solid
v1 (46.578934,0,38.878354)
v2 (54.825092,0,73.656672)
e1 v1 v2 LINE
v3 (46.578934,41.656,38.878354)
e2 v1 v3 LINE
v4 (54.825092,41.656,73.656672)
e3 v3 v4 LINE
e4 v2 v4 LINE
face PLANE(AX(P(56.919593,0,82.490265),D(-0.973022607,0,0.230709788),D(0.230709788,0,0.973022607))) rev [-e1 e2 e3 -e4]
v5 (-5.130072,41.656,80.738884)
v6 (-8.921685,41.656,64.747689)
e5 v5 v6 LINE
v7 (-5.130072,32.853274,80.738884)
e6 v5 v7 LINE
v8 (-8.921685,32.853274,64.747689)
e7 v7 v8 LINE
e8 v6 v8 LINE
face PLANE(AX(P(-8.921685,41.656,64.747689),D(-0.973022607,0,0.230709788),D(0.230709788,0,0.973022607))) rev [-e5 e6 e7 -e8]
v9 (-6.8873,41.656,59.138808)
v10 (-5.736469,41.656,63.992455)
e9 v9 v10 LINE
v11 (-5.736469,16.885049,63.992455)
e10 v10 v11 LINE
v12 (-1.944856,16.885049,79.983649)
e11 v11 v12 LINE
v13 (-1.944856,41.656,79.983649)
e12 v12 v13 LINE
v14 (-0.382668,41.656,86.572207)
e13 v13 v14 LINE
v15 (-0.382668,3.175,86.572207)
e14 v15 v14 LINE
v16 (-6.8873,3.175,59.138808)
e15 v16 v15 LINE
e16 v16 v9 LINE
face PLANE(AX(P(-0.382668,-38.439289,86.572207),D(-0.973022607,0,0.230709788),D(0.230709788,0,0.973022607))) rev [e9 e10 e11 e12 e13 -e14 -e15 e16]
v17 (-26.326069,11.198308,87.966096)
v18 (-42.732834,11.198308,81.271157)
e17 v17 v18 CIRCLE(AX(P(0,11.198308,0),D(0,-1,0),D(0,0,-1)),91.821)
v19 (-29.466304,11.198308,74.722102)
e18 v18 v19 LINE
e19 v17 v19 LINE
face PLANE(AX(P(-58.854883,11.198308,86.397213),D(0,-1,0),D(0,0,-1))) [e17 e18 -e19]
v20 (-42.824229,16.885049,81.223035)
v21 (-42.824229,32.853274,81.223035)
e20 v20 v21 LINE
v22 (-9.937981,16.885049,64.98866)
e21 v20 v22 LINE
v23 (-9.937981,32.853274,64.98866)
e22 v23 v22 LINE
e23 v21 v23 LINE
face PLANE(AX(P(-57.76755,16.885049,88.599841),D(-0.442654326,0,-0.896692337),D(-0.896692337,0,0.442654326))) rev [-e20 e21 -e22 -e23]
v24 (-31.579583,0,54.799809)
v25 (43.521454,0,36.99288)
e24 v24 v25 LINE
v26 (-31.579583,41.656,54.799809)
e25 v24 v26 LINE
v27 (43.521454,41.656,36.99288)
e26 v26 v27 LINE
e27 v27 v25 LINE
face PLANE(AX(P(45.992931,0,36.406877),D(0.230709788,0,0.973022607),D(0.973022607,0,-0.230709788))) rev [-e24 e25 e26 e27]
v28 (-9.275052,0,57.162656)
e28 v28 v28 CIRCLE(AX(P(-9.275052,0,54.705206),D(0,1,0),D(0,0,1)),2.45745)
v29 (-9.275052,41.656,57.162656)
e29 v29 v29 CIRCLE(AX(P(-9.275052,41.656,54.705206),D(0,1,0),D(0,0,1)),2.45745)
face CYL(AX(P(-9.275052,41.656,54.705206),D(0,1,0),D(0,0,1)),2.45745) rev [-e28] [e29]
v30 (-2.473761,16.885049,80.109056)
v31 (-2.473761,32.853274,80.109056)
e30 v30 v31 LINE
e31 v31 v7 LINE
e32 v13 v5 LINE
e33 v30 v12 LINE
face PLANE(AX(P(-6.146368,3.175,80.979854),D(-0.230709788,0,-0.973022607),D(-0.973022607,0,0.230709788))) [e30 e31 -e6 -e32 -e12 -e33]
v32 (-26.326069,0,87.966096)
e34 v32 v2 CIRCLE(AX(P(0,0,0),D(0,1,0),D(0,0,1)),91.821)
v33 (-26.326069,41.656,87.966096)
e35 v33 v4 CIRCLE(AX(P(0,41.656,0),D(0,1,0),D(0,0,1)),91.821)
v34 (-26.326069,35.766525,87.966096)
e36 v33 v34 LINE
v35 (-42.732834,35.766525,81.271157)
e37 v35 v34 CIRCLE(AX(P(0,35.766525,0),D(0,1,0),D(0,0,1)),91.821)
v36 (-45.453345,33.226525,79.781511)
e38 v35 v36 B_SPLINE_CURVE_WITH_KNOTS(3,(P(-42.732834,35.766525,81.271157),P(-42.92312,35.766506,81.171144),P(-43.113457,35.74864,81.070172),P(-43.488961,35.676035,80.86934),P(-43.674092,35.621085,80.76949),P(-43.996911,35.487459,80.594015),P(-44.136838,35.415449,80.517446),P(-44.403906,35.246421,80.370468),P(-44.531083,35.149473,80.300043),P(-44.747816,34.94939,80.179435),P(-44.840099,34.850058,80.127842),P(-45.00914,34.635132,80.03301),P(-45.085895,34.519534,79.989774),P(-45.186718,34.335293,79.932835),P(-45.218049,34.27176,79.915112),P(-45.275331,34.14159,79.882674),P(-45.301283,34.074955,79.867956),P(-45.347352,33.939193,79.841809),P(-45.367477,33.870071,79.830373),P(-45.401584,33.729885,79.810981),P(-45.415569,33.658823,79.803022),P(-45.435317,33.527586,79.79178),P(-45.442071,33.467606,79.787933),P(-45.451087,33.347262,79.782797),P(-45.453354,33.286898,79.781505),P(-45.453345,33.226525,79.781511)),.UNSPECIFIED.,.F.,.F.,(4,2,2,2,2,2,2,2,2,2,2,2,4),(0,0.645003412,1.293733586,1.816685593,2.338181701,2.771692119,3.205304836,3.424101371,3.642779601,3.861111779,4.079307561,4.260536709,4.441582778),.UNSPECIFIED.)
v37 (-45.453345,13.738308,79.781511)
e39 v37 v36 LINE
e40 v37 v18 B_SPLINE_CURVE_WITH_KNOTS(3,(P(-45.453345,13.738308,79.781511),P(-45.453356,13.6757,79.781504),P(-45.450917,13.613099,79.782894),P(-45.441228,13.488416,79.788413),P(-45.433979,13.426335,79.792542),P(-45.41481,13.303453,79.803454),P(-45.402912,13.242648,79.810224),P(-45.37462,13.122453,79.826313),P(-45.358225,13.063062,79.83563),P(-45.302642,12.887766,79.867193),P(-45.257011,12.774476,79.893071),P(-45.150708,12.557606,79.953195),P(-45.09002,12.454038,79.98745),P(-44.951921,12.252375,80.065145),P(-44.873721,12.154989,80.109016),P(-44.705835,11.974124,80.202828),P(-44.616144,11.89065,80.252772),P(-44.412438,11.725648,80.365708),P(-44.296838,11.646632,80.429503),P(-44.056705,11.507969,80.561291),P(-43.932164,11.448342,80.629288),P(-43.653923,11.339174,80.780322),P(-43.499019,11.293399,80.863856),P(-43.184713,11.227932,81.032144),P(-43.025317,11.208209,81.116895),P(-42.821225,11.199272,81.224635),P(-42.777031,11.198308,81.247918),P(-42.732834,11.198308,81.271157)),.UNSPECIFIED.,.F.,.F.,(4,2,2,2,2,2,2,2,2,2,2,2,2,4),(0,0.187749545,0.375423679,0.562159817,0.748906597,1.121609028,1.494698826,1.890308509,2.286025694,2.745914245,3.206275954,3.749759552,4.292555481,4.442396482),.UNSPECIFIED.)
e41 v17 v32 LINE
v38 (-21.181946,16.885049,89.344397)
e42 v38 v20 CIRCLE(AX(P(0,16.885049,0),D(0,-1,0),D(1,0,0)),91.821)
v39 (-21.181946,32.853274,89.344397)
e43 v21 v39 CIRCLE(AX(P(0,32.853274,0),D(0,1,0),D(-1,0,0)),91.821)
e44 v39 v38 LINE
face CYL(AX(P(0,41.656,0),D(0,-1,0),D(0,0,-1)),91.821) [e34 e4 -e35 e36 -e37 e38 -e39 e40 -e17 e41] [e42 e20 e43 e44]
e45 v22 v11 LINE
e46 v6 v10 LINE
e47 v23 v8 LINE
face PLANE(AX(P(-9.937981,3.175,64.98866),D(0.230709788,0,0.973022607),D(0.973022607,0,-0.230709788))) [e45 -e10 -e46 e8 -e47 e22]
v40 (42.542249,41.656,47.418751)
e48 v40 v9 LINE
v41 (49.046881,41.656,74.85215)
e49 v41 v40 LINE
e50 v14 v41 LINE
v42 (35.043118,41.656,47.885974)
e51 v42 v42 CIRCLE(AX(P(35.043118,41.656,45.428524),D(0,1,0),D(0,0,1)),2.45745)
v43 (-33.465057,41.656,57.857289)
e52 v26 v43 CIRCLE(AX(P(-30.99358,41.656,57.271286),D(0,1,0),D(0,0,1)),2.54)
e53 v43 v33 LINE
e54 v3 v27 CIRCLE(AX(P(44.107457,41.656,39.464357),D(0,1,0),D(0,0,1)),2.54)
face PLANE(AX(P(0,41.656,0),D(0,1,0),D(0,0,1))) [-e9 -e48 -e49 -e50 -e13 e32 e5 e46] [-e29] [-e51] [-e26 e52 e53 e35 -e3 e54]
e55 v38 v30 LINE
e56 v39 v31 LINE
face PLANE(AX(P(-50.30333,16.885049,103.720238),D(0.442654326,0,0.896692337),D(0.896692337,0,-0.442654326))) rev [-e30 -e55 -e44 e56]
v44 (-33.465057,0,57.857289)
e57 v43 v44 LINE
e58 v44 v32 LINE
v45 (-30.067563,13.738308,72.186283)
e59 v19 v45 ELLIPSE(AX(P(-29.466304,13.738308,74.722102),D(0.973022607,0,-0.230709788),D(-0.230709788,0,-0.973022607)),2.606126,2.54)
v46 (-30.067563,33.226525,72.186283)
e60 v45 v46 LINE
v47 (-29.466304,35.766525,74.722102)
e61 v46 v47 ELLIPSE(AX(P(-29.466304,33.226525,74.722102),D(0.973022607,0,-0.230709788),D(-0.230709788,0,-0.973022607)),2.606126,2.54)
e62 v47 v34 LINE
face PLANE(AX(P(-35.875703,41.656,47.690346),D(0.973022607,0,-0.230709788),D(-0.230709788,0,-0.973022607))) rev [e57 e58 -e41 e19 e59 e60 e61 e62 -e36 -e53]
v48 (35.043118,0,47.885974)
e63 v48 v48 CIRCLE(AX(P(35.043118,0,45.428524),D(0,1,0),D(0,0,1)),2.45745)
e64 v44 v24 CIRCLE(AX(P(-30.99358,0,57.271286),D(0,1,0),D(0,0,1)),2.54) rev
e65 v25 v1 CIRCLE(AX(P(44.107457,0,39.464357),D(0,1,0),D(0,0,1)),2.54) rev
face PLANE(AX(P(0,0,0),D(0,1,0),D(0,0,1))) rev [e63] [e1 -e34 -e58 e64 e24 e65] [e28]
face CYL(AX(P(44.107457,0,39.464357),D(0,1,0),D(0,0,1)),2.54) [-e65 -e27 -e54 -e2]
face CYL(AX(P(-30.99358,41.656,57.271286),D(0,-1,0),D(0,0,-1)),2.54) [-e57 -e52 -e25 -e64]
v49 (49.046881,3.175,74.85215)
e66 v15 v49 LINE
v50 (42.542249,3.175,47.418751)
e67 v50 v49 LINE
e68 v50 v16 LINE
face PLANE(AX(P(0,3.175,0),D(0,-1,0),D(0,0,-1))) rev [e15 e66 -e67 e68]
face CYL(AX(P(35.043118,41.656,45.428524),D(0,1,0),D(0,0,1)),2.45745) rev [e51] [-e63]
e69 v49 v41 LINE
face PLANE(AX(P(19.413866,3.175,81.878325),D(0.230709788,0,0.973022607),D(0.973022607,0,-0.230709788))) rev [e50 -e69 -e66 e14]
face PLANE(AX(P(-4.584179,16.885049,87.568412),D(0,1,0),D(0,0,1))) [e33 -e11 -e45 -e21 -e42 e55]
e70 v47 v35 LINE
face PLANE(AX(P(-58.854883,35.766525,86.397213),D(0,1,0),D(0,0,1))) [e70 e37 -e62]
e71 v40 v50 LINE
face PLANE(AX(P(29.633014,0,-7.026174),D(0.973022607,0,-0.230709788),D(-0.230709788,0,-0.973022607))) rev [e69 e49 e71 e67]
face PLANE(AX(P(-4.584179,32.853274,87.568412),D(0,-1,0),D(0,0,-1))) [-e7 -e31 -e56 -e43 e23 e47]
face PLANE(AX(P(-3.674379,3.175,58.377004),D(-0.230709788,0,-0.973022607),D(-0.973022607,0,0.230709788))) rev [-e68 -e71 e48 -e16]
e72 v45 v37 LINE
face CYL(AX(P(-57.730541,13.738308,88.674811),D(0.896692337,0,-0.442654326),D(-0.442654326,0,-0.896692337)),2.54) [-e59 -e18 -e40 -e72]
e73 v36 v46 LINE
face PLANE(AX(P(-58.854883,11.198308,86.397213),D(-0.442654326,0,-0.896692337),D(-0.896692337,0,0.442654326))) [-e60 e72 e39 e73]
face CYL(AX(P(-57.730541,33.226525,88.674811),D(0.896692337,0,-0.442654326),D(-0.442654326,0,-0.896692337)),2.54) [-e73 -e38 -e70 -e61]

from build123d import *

# Parameters (mm, degrees)
BOSS_EXTRUDE1_DEPTH          = 41.656
CUT_EXTRUDE1_DEPTH           = 38.481
CUT_EXTRUDE2_START           = -28.8671
SKETCH11_W                   = 16.434556017
SKETCH11_H                   = 15.968225366
CUT_EXTRUDE2_DEPTH           = 7.62
SKETCH16_W                   = 24.568216569
SKETCH16_H                   = 19.806256701
BOSS_EXTRUDE3_DEPTH          = 53.34
CUT_EXTRUDE3_START           = -24.568216569
CUT_EXTRUDE3_DEPTH           = 24.568216569
SKETCH22_W                   = 16.862412739
SKETCH22_H                   = 15.968225366
CUT_EXTRUDE4_DEPTH           = 53.34
CUT_EXTRUDE6_DEPTH           = 119.901499034
F_10_0_1935_DIAMETER_HOLE1_D = 4.9149
CUT_EXTRUDE11_REACH          = 116.77
CUT_EXTRUDE9_DEPTH           = 112.875933154
FILLET2_R                    = 2.54
SKETCH34_W                   = 28.194
SKETCH34_H                   = 38.481
BOSS_EXTRUDE4_DEPTH          = 3.302


# Read off the part's stored shape, not the designer's step: Cut-Extrude3
with BuildPart() as part:
    # Sketch1 → Boss-Extrude1 (new body)
    with BuildSketch(Plane(origin=(0, 0, 0), x_dir=(1, 0, 0), z_dir=(0, 1, 0))):
        with BuildLine():
            Line((63.017839503, -66.782093), (53.468205472, -26.506342671))
            Line((53.468205472, -26.506342671), (-35.875703335, -47.690346072))
            Line((-35.875703335, -47.690346072), (-26.326069304, -87.966096401))
            ThreePointArc((-26.326069304, -87.966096401), (21.184003401, -89.343908807), (63.017839503, -66.782093))
        make_face()
    extrude(amount=BOSS_EXTRUDE1_DEPTH)

    # Sketch2 → Cut-Extrude1 (cut)
    with BuildSketch(Plane(origin=(0, 41.656, 0), x_dir=(1, 0, 0), z_dir=(0, 1, 0))):
        Polygon((19.413866358, -81.878324539), (52.259801297, -74.090346526), (45.755169548, -46.656947141), (-3.674378893, -58.377004348), (2.830252857, -85.810403732), align=None)
    extrude(amount=-CUT_EXTRUDE1_DEPTH, mode=Mode.SUBTRACT)

    # Sketch11 → Cut-Extrude2 (cut)
    with BuildSketch(Plane(origin=(-44.671954403, 0, 10.592001701), x_dir=(0.230709787533386, 0, 0.973022607104429), z_dir=(-0.973022607104429, 0, 0.230709787533386)).offset(CUT_EXTRUDE2_START)):
        with Locations((69.159923537, 24.869161711)):
            Rectangle(SKETCH11_W, SKETCH11_H)
    extrude(amount=CUT_EXTRUDE2_DEPTH, mode=Mode.SUBTRACT)

    # Sketch16 → Boss-Extrude3 (add)
    with BuildSketch(Plane(origin=(-33.786311583, 0, 16.678693854), x_dir=(0, -1, 0), z_dir=(0.8966923373350206, 0, -0.4426543258171746))):
        with Locations((-23.482416275, -61.32247831)):
            Rectangle(SKETCH16_W, SKETCH16_H)
    extrude(amount=-BOSS_EXTRUDE3_DEPTH)

    # Cut-Extrude3 outline → Cut-Extrude3 (cut)
    with BuildSketch(Plane(origin=(0, 35.766524559, 0), x_dir=(1, 0, 0), z_dir=(0, 1, 0)).offset(CUT_EXTRUDE3_START)):
        with BuildLine():
            Line((-50.087557959, -104.157331307), (-20.43350094, -89.518534843))
            ThreePointArc((-20.43350094, -89.518534843), (-33.301223909, -85.569413503), (-45.453344654, -79.781511021))
            Line((-45.453344654, -79.781511021), (-58.854883166, -86.397212692))
            Line((-58.854883166, -86.397212692), (-50.087557959, -104.157331307))
        make_face()
    extrude(amount=CUT_EXTRUDE3_DEPTH, mode=Mode.SUBTRACT)

    # Sketch22 → Cut-Extrude4 (cut)
    with BuildSketch(Plane(origin=(-33.786311583, 0, 16.678693854), x_dir=(-0.4426543258171747, 0, -0.8966923373350206), z_dir=(0.8966923373350207, 0, -0.44265432581717473))):
        with Locations((-62.30694919, 24.869161711)):
            Rectangle(SKETCH22_W, SKETCH22_H)
    extrude(amount=-CUT_EXTRUDE4_DEPTH, mode=Mode.SUBTRACT)

    # Sketch24 → Cut-Extrude6 (cut, through all)
    with BuildSketch(Plane(origin=(0, 41.656, 0), x_dir=(1, 0, 0), z_dir=(0, 1, 0))):
        Polygon((56.919592876, -82.490265238), (45.99293133, -36.406877021), (-47.298720085, -58.526915055), (-50.529685657, -44.900260642), (55.061086644, -19.864023596), (69.218713762, -79.574066225), align=None)
    extrude(amount=-CUT_EXTRUDE6_DEPTH, mode=Mode.SUBTRACT)

    # #10 (0.1935) Diameter Hole1 (through all)
    with Locations(Plane(origin=(0, 41.656, 0), x_dir=(1, 0, 0), z_dir=(0, 1, 0))):
        with Locations((-9.275051774, -54.705205641), (35.043117703, -45.428524284)):
            Hole(F_10_0_1935_DIAMETER_HOLE1_D / 2)

    # Cut-Extrude11: up to this face of the body (flat: up to its plane)
    cut_extrude11_end = Plane(part.part.faces().sort_by_distance((24.292711202, 3.175, 66.233675437))[0])
    # Sketch33 → Cut-Extrude11 (cut, up to the picked face)
    with BuildSketch(Plane(origin=(0, 41.656, 0), x_dir=(1, 0, 0), z_dir=(0, 1, 0)), mode=Mode.PRIVATE) as cut_extrude11_sk1:
        Polygon((-6.887299542, -59.138808066), (13.024531054, -54.417587641), (19.529162804, -81.850987026), (-0.382667792, -86.572207451), align=None)
    cut_extrude11_tool1 = split(extrude(cut_extrude11_sk1.sketch, amount=-CUT_EXTRUDE11_REACH, mode=Mode.PRIVATE), bisect_by=cut_extrude11_end, keep=Keep.BOTH, mode=Mode.PRIVATE)
    add(cut_extrude11_tool1.solids().sort_by(Axis((6.320932, 41.656, 70.494898), (0, -1, 0)))[0], mode=Mode.SUBTRACT)

    # Sketch30 → Cut-Extrude9 (cut, through all)
    with BuildSketch(Plane.XZ.offset(-32.853274394)):
        Polygon((-5.736469349, 63.992454746), (-1.944856422, 79.983649289), (-5.130071965, 80.738883952), (-8.921684892, 64.74768941), align=None)
    extrude(amount=-CUT_EXTRUDE9_DEPTH, mode=Mode.SUBTRACT)

    # Fillet2
    fillet2_edges = [part.edges().sort_by_distance(p)[0] for p in [
        (-34.051060037, 20.828, 55.385811433),
        (45.99293133, 20.828, 36.406877021),
        (-37.760453577, 11.19830799, 75.983896866),
        (-37.760453577, 35.766524559, 75.983896866),
    ]]
    fillet(fillet2_edges, radius=FILLET2_R)

    # Sketch34 → Boss-Extrude4 (add)
    with BuildSketch(Plane(origin=(32.845934939, 0, -7.787978014), x_dir=(0.23070978753338592, 0, 0.973022607104429), z_dir=(-0.9730226071044291, 0, 0.23070978753338595))):
        with Locations((70.051429791, 22.4155)):
            Rectangle(SKETCH34_W, SKETCH34_H)
    extrude(amount=BOSS_EXTRUDE4_DEPTH)


solid = part.part
